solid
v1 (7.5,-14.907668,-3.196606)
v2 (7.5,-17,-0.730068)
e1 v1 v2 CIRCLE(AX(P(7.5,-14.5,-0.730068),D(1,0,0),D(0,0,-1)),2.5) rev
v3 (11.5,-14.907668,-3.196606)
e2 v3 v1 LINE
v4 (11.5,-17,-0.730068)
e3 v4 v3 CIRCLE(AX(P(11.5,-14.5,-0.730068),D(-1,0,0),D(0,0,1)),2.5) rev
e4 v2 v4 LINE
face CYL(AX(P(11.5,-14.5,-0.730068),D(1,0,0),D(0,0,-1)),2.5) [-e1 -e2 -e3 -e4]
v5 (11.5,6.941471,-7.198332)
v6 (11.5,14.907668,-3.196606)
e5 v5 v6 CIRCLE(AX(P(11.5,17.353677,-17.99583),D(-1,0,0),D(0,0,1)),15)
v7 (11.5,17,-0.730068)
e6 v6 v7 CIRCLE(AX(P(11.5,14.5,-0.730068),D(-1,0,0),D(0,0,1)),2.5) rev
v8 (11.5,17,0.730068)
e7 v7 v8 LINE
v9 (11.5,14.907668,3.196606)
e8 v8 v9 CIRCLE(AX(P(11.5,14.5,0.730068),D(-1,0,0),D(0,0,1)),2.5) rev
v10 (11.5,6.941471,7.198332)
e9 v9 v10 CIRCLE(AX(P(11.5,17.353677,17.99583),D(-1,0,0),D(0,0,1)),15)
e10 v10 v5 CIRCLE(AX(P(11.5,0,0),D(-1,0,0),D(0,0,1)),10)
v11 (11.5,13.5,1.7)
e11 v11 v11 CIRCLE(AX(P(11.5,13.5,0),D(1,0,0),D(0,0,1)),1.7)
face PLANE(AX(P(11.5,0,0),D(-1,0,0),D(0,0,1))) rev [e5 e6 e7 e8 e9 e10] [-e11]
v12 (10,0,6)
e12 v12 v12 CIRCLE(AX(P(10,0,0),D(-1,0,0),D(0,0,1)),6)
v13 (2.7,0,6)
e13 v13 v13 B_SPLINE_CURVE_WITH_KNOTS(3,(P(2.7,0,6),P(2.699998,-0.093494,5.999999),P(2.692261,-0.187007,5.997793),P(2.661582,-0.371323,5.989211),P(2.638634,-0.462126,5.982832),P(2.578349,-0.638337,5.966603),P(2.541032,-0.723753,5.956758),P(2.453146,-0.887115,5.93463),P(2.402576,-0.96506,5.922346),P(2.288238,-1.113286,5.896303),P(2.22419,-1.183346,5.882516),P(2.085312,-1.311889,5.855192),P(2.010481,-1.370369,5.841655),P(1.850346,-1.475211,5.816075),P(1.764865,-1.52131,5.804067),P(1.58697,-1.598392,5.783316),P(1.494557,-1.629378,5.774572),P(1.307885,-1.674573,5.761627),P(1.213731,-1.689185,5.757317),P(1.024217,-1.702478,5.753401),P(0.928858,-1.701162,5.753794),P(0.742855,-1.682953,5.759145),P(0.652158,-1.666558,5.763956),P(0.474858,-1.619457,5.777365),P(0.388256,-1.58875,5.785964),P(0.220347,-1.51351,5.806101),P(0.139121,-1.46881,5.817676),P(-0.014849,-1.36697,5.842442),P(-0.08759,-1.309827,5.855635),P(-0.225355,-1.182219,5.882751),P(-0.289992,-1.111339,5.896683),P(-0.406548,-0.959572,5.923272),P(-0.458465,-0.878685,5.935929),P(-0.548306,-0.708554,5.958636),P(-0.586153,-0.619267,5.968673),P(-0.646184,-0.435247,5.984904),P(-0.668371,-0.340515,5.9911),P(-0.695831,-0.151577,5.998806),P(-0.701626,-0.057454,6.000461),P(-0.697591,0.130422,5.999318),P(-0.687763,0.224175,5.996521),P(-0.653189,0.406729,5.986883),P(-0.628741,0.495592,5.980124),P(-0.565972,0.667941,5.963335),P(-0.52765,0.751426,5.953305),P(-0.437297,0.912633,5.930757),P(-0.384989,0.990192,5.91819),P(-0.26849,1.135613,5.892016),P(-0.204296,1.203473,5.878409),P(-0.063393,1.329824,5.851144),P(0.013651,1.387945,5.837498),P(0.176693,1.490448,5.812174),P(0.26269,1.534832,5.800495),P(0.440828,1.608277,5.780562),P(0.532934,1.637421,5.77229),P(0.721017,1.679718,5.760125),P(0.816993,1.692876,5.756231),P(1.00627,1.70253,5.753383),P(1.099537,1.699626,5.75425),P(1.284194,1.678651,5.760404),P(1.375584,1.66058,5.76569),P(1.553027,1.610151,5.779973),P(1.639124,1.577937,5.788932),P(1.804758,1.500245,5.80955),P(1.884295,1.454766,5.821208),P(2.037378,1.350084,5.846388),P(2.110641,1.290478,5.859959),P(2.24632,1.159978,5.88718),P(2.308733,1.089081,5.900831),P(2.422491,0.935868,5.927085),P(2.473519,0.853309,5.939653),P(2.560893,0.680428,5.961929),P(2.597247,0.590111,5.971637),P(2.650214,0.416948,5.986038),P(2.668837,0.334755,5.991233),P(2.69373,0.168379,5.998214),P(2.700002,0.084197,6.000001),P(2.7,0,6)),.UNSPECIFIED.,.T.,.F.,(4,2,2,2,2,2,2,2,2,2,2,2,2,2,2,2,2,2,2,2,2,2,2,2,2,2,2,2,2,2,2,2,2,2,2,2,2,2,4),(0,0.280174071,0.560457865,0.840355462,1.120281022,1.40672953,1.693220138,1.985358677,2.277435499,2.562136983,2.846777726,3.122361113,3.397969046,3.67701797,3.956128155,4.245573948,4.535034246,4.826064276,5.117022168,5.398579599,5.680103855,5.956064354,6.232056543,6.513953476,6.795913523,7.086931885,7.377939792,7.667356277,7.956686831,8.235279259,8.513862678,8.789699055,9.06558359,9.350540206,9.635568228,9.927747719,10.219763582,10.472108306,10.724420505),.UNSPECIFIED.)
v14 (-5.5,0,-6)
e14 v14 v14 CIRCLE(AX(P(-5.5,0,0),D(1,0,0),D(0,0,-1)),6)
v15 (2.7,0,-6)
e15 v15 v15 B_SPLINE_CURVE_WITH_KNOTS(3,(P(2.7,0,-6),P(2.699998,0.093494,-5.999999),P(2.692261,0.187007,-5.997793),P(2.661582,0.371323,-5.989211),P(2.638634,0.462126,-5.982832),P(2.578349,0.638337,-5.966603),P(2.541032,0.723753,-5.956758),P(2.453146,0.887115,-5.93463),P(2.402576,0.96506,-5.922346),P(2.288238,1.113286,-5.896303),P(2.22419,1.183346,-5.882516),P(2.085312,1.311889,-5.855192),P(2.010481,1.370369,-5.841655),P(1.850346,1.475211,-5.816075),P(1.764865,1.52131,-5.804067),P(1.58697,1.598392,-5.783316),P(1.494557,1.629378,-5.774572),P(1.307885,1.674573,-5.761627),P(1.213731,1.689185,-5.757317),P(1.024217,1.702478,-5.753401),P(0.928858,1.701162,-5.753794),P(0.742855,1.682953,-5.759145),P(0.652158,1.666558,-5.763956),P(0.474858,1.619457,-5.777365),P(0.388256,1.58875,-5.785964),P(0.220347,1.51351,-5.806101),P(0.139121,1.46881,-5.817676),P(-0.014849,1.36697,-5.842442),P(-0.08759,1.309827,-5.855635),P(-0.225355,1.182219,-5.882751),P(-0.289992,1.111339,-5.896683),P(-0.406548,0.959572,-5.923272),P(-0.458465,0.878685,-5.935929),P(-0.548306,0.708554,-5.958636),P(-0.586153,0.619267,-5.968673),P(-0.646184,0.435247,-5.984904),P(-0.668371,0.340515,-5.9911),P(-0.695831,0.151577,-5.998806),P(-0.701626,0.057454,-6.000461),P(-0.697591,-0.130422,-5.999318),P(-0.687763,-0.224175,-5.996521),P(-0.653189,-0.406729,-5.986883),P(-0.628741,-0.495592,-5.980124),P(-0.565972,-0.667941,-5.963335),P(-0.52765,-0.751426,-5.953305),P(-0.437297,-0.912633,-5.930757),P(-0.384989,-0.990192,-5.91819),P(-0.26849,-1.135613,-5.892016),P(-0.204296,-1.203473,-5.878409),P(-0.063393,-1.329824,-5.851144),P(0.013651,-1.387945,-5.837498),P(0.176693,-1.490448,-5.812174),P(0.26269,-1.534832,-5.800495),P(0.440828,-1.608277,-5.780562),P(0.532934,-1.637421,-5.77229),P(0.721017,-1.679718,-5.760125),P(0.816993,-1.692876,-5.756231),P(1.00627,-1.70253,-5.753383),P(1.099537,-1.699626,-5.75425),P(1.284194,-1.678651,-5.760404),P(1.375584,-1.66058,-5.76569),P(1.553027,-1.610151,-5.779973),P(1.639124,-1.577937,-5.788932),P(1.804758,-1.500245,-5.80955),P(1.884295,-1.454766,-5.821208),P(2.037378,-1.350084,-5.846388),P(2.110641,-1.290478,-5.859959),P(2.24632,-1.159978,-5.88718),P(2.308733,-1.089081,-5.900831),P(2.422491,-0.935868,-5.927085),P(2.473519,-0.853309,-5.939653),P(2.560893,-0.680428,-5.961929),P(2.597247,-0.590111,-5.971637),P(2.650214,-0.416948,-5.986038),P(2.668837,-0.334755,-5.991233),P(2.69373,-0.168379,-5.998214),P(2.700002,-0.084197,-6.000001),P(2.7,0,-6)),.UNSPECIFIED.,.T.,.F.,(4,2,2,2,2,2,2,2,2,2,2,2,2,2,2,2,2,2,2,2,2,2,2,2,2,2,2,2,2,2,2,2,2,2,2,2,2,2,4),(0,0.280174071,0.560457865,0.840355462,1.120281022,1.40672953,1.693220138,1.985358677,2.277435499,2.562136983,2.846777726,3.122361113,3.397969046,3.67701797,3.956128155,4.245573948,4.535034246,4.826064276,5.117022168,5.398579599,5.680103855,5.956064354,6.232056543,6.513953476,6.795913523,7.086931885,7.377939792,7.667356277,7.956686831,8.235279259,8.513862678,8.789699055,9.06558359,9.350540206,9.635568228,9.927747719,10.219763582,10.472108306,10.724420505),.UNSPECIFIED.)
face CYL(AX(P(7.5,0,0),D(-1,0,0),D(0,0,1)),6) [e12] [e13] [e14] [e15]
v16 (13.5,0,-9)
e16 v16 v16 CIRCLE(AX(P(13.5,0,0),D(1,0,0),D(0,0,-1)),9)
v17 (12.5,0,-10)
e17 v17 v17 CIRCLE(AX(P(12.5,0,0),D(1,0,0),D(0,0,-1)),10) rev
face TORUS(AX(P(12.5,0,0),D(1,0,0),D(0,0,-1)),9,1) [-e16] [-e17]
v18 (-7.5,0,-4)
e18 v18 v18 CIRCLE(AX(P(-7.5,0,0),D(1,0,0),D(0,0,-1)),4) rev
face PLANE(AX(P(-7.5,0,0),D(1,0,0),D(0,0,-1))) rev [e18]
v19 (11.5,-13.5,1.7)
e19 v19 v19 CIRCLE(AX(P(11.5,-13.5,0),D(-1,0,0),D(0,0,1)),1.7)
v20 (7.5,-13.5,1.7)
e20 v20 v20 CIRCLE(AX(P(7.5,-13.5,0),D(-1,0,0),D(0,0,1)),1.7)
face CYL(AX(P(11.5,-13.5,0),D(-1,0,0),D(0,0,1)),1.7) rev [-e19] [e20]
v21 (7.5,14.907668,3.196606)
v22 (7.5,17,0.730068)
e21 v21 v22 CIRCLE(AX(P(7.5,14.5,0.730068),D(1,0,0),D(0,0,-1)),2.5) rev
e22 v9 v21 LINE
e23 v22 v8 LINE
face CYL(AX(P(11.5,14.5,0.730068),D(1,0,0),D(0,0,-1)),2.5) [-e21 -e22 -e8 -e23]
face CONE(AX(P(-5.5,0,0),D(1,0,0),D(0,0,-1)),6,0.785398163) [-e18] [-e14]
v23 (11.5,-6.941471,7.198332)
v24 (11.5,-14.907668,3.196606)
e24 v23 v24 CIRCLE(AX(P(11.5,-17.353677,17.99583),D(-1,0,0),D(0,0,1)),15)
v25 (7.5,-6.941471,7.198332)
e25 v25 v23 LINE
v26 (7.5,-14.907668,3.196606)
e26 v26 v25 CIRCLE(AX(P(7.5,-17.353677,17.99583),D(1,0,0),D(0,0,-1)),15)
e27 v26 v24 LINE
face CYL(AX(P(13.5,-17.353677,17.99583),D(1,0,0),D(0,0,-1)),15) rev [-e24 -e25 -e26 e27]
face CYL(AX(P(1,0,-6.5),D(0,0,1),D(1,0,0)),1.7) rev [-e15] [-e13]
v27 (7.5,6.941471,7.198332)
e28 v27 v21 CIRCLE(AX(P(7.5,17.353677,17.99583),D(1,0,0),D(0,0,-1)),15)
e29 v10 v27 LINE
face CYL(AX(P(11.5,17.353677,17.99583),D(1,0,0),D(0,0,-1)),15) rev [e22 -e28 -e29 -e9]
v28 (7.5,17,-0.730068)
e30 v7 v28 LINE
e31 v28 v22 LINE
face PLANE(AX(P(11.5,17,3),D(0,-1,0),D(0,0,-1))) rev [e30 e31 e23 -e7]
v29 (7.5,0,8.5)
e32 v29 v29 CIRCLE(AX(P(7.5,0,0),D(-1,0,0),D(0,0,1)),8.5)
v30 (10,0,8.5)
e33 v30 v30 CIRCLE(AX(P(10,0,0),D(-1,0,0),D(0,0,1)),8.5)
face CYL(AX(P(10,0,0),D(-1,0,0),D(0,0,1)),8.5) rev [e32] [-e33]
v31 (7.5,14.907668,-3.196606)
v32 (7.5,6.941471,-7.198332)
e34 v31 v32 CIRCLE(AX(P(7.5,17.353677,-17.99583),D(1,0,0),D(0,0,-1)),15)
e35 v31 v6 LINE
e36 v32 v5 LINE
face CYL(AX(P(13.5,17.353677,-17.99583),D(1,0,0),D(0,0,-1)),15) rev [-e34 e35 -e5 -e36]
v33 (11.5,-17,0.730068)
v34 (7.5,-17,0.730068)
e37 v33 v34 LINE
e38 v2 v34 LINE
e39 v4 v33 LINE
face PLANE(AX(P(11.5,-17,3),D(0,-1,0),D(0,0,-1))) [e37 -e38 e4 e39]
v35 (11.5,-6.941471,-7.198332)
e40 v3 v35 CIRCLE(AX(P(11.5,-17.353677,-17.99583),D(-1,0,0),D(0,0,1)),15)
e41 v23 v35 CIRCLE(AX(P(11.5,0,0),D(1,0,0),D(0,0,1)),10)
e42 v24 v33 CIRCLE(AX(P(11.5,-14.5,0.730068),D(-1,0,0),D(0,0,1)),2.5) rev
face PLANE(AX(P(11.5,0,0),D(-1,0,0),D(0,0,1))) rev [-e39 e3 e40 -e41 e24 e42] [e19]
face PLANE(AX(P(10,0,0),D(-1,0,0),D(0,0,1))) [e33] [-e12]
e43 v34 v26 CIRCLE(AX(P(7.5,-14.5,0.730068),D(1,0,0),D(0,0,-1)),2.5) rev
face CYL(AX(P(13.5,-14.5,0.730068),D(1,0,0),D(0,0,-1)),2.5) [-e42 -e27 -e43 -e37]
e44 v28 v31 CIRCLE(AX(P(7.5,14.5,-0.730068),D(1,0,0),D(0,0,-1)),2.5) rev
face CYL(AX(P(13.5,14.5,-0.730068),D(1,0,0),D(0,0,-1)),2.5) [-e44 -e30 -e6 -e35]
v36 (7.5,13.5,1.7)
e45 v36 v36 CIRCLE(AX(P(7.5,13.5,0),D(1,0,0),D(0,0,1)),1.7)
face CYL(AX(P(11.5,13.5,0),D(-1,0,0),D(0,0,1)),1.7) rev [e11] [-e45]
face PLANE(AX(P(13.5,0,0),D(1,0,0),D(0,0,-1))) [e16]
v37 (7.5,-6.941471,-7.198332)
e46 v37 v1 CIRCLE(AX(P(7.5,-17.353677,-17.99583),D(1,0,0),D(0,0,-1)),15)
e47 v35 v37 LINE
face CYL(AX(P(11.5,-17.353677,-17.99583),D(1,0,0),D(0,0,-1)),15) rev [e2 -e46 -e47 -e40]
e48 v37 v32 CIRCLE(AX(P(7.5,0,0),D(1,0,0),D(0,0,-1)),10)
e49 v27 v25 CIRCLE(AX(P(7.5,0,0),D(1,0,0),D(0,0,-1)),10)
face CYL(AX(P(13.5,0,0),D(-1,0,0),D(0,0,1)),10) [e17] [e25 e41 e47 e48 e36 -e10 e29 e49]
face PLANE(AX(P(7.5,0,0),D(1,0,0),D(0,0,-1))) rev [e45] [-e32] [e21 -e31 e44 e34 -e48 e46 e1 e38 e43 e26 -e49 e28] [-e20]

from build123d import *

# Parameters (mm, degrees)
CROQUIS1_R               = 6
SALIENTE_EXTRUIR1_DEPTH  = 7.5
CROQUIS2_R               = 10
SALIENTE_EXTRUIR2_DEPTH  = 6
CORTAR_EXTRUIR1_START    = -2.5
CROQUIS3_R               = 8.5
CROQUIS3_R_2             = 6
CORTAR_EXTRUIR1_DEPTH    = 2.5
CROQUIS4_R               = 1.7
SALIENTE_EXTRUIR3_DEPTH  = 4
REDONDEO1_R              = 15
CROQUIS5_R               = 1.7
CORTAR_EXTRUIR2_DEPTH    = 6.5
REDONDEO1_OF_SIMETR_A1_R = 15
REDONDEO2_R              = 2.5
CHAFL_N1_SIZE            = 2
REDONDEO3_R              = 1


with BuildPart() as part:
    # Croquis1 → Saliente-Extruir1 (new, symmetric)
    with BuildSketch(Plane(origin=(0, 0, 0), x_dir=(0, 0, -1), z_dir=(1, 0, 0))):
        Circle(CROQUIS1_R)
    extrude(amount=SALIENTE_EXTRUIR1_DEPTH, both=True)

    # Croquis2 → Saliente-Extruir2 (add)
    with BuildSketch(Plane(origin=(7.5, 0, 0), x_dir=(0, 0, -1), z_dir=(1, 0, 0))):
        Circle(CROQUIS2_R)
    extrude(amount=SALIENTE_EXTRUIR2_DEPTH)

    # Croquis3 → Cortar-Extruir1 (cut)
    with BuildSketch(Plane.ZY.offset(-7.5).offset(CORTAR_EXTRUIR1_START)):
        Circle(CROQUIS3_R)
        Circle(CROQUIS3_R_2, mode=Mode.SUBTRACT)
    extrude(amount=CORTAR_EXTRUIR1_DEPTH, mode=Mode.SUBTRACT)

    # Croquis4 → Saliente-Extruir3 (add)
    with BuildSketch(Plane.ZY.offset(-7.5)):
        with BuildLine():
            Line((3, -9.539392014), (3, -17))
            Line((3, -17), (-3, -17))
            Line((-3, -17), (-3, -9.539392014))
            ThreePointArc((-3, -9.539392014), (0, -10), (3, -9.539392014))
        make_face()
        with Locations((0, -13.5)):
            Circle(CROQUIS4_R, mode=Mode.SUBTRACT)
    saliente_extruir3 = extrude(amount=-SALIENTE_EXTRUIR3_DEPTH)

    # Redondeo1
    # the kernel refuses this fillet: 15 mm, written as the material it adds along each edge
    with BuildSketch(Plane(origin=(7.5, -9.539392014, -3), x_dir=(0, 0.5262014079949279, -0.8503599697917085), z_dir=(1, 0, 0))) as redondeo1_piece_1:
        with BuildLine():
            CenterArc((8.6399656, -14.535781993), REDONDEO1_R, 104.291553589, 42.60821753)
            Line((-3.925782427, -6.344202381), (-4.177097387, -6.180370789))
            ThreePointArc((-4.177097387, -6.180370789), (-2.217999204, -3.014240768), (-0.255107991, 0.157860422))
            Line((-0.255107991, 0.157860422), (0.074056848, 0.29071564))
            ThreePointArc((0.074056848, 0.29071564), (2.4685616, -0.009478671), (4.863066352, 0.29071564))
            Line((4.863066352, 0.29071564), (4.9371232, 0))
        make_face()
    extrude(amount=4)
    with BuildSketch(Plane(origin=(7.5, -9.539392014, 3), x_dir=(0, 0.5262014079949285, 0.8503599697917081), z_dir=(1, 0, 0))) as redondeo1_piece_2:
        with BuildLine():
            CenterArc((8.6399656, 14.535781993), REDONDEO1_R, 213.100228881, 42.60821753)
            Line((-3.925782427, 6.344202381), (-4.177097387, 6.180370789))
            ThreePointArc((-4.177097387, 6.180370789), (-2.217999204, 3.014240768), (-0.255107991, -0.157860422))
            Line((-0.255107991, -0.157860422), (0.074056848, -0.29071564))
            ThreePointArc((0.074056848, -0.29071564), (2.4685616, 0.009478671), (4.863066352, -0.29071564))
            Line((4.863066352, -0.29071564), (4.9371232, 0))
        make_face()
    extrude(amount=4)

    # Croquis5 → Cortar-Extruir2 (cut, symmetric)
    with BuildSketch(Plane.XY):
        with Locations((1, 0)):
            Circle(CROQUIS5_R)
    extrude(amount=CORTAR_EXTRUIR2_DEPTH, both=True, mode=Mode.SUBTRACT)

    # Simetría1: Saliente-Extruir3 across plane
    add(saliente_extruir3.mirror(Plane.ZX))

    # Redondeo1 of Simetría1
    # the kernel refuses this fillet: 15 mm, written as the material it adds along each edge
    with BuildSketch(Plane(origin=(7.5, 9.539392014, -3), x_dir=(0, -0.526201407994929, -0.8503599697917078), z_dir=(1, 0, 0))) as redondeo1_of_simetr_a1_piece_1:
        with BuildLine():
            CenterArc((8.6399656, 14.535781993), REDONDEO1_OF_SIMETR_A1_R, 213.100228881, 42.60821753)
            Line((-3.925782427, 6.344202381), (-4.177097387, 6.180370789))
            ThreePointArc((-4.177097387, 6.180370789), (-2.217999204, 3.014240768), (-0.255107991, -0.157860422))
            Line((-0.255107991, -0.157860422), (0.074056848, -0.29071564))
            ThreePointArc((0.074056848, -0.29071564), (2.4685616, 0.009478671), (4.863066352, -0.29071564))
            Line((4.863066352, -0.29071564), (4.9371232, 0))
        make_face()
    extrude(amount=4)
    with BuildSketch(Plane(origin=(7.5, 9.539392014, 3), x_dir=(0, -0.5262014079949293, 0.8503599697917078), z_dir=(1, 0, 0))) as redondeo1_of_simetr_a1_piece_2:
        with BuildLine():
            CenterArc((8.6399656, -14.535781993), REDONDEO1_OF_SIMETR_A1_R, 104.291553589, 42.60821753)
            Line((-3.925782427, -6.344202381), (-4.177097387, -6.180370789))
            ThreePointArc((-4.177097387, -6.180370789), (-2.217999204, -3.014240768), (-0.255107991, 0.157860422))
            Line((-0.255107991, 0.157860422), (0.074056848, 0.29071564))
            ThreePointArc((0.074056848, 0.29071564), (2.4685616, -0.009478671), (4.863066352, 0.29071564))
            Line((4.863066352, 0.29071564), (4.9371232, 0))
        make_face()
    extrude(amount=4)

    # Redondeo2
    redondeo2_edges = [part.edges().sort_by_distance(p)[0] for p in [
        (9.5, -17, 3),
        (9.5, -17, -3),
        (9.5, 17, -3),
        (9.5, 17, 3),
    ]]
    fillet(redondeo2_edges, radius=REDONDEO2_R)

    # Chaflán1
    chafl_n1_edges = [part.edges().sort_by_distance(p)[0] for p in [
        (-7.5, 0, 6),
    ]]
    chamfer(chafl_n1_edges, length=CHAFL_N1_SIZE)

    # Redondeo3
    redondeo3_edges = [part.edges().sort_by_distance(p)[0] for p in [
        (13.5, 0, 10),
    ]]
    fillet(redondeo3_edges, radius=REDONDEO3_R)


solid = part.part
